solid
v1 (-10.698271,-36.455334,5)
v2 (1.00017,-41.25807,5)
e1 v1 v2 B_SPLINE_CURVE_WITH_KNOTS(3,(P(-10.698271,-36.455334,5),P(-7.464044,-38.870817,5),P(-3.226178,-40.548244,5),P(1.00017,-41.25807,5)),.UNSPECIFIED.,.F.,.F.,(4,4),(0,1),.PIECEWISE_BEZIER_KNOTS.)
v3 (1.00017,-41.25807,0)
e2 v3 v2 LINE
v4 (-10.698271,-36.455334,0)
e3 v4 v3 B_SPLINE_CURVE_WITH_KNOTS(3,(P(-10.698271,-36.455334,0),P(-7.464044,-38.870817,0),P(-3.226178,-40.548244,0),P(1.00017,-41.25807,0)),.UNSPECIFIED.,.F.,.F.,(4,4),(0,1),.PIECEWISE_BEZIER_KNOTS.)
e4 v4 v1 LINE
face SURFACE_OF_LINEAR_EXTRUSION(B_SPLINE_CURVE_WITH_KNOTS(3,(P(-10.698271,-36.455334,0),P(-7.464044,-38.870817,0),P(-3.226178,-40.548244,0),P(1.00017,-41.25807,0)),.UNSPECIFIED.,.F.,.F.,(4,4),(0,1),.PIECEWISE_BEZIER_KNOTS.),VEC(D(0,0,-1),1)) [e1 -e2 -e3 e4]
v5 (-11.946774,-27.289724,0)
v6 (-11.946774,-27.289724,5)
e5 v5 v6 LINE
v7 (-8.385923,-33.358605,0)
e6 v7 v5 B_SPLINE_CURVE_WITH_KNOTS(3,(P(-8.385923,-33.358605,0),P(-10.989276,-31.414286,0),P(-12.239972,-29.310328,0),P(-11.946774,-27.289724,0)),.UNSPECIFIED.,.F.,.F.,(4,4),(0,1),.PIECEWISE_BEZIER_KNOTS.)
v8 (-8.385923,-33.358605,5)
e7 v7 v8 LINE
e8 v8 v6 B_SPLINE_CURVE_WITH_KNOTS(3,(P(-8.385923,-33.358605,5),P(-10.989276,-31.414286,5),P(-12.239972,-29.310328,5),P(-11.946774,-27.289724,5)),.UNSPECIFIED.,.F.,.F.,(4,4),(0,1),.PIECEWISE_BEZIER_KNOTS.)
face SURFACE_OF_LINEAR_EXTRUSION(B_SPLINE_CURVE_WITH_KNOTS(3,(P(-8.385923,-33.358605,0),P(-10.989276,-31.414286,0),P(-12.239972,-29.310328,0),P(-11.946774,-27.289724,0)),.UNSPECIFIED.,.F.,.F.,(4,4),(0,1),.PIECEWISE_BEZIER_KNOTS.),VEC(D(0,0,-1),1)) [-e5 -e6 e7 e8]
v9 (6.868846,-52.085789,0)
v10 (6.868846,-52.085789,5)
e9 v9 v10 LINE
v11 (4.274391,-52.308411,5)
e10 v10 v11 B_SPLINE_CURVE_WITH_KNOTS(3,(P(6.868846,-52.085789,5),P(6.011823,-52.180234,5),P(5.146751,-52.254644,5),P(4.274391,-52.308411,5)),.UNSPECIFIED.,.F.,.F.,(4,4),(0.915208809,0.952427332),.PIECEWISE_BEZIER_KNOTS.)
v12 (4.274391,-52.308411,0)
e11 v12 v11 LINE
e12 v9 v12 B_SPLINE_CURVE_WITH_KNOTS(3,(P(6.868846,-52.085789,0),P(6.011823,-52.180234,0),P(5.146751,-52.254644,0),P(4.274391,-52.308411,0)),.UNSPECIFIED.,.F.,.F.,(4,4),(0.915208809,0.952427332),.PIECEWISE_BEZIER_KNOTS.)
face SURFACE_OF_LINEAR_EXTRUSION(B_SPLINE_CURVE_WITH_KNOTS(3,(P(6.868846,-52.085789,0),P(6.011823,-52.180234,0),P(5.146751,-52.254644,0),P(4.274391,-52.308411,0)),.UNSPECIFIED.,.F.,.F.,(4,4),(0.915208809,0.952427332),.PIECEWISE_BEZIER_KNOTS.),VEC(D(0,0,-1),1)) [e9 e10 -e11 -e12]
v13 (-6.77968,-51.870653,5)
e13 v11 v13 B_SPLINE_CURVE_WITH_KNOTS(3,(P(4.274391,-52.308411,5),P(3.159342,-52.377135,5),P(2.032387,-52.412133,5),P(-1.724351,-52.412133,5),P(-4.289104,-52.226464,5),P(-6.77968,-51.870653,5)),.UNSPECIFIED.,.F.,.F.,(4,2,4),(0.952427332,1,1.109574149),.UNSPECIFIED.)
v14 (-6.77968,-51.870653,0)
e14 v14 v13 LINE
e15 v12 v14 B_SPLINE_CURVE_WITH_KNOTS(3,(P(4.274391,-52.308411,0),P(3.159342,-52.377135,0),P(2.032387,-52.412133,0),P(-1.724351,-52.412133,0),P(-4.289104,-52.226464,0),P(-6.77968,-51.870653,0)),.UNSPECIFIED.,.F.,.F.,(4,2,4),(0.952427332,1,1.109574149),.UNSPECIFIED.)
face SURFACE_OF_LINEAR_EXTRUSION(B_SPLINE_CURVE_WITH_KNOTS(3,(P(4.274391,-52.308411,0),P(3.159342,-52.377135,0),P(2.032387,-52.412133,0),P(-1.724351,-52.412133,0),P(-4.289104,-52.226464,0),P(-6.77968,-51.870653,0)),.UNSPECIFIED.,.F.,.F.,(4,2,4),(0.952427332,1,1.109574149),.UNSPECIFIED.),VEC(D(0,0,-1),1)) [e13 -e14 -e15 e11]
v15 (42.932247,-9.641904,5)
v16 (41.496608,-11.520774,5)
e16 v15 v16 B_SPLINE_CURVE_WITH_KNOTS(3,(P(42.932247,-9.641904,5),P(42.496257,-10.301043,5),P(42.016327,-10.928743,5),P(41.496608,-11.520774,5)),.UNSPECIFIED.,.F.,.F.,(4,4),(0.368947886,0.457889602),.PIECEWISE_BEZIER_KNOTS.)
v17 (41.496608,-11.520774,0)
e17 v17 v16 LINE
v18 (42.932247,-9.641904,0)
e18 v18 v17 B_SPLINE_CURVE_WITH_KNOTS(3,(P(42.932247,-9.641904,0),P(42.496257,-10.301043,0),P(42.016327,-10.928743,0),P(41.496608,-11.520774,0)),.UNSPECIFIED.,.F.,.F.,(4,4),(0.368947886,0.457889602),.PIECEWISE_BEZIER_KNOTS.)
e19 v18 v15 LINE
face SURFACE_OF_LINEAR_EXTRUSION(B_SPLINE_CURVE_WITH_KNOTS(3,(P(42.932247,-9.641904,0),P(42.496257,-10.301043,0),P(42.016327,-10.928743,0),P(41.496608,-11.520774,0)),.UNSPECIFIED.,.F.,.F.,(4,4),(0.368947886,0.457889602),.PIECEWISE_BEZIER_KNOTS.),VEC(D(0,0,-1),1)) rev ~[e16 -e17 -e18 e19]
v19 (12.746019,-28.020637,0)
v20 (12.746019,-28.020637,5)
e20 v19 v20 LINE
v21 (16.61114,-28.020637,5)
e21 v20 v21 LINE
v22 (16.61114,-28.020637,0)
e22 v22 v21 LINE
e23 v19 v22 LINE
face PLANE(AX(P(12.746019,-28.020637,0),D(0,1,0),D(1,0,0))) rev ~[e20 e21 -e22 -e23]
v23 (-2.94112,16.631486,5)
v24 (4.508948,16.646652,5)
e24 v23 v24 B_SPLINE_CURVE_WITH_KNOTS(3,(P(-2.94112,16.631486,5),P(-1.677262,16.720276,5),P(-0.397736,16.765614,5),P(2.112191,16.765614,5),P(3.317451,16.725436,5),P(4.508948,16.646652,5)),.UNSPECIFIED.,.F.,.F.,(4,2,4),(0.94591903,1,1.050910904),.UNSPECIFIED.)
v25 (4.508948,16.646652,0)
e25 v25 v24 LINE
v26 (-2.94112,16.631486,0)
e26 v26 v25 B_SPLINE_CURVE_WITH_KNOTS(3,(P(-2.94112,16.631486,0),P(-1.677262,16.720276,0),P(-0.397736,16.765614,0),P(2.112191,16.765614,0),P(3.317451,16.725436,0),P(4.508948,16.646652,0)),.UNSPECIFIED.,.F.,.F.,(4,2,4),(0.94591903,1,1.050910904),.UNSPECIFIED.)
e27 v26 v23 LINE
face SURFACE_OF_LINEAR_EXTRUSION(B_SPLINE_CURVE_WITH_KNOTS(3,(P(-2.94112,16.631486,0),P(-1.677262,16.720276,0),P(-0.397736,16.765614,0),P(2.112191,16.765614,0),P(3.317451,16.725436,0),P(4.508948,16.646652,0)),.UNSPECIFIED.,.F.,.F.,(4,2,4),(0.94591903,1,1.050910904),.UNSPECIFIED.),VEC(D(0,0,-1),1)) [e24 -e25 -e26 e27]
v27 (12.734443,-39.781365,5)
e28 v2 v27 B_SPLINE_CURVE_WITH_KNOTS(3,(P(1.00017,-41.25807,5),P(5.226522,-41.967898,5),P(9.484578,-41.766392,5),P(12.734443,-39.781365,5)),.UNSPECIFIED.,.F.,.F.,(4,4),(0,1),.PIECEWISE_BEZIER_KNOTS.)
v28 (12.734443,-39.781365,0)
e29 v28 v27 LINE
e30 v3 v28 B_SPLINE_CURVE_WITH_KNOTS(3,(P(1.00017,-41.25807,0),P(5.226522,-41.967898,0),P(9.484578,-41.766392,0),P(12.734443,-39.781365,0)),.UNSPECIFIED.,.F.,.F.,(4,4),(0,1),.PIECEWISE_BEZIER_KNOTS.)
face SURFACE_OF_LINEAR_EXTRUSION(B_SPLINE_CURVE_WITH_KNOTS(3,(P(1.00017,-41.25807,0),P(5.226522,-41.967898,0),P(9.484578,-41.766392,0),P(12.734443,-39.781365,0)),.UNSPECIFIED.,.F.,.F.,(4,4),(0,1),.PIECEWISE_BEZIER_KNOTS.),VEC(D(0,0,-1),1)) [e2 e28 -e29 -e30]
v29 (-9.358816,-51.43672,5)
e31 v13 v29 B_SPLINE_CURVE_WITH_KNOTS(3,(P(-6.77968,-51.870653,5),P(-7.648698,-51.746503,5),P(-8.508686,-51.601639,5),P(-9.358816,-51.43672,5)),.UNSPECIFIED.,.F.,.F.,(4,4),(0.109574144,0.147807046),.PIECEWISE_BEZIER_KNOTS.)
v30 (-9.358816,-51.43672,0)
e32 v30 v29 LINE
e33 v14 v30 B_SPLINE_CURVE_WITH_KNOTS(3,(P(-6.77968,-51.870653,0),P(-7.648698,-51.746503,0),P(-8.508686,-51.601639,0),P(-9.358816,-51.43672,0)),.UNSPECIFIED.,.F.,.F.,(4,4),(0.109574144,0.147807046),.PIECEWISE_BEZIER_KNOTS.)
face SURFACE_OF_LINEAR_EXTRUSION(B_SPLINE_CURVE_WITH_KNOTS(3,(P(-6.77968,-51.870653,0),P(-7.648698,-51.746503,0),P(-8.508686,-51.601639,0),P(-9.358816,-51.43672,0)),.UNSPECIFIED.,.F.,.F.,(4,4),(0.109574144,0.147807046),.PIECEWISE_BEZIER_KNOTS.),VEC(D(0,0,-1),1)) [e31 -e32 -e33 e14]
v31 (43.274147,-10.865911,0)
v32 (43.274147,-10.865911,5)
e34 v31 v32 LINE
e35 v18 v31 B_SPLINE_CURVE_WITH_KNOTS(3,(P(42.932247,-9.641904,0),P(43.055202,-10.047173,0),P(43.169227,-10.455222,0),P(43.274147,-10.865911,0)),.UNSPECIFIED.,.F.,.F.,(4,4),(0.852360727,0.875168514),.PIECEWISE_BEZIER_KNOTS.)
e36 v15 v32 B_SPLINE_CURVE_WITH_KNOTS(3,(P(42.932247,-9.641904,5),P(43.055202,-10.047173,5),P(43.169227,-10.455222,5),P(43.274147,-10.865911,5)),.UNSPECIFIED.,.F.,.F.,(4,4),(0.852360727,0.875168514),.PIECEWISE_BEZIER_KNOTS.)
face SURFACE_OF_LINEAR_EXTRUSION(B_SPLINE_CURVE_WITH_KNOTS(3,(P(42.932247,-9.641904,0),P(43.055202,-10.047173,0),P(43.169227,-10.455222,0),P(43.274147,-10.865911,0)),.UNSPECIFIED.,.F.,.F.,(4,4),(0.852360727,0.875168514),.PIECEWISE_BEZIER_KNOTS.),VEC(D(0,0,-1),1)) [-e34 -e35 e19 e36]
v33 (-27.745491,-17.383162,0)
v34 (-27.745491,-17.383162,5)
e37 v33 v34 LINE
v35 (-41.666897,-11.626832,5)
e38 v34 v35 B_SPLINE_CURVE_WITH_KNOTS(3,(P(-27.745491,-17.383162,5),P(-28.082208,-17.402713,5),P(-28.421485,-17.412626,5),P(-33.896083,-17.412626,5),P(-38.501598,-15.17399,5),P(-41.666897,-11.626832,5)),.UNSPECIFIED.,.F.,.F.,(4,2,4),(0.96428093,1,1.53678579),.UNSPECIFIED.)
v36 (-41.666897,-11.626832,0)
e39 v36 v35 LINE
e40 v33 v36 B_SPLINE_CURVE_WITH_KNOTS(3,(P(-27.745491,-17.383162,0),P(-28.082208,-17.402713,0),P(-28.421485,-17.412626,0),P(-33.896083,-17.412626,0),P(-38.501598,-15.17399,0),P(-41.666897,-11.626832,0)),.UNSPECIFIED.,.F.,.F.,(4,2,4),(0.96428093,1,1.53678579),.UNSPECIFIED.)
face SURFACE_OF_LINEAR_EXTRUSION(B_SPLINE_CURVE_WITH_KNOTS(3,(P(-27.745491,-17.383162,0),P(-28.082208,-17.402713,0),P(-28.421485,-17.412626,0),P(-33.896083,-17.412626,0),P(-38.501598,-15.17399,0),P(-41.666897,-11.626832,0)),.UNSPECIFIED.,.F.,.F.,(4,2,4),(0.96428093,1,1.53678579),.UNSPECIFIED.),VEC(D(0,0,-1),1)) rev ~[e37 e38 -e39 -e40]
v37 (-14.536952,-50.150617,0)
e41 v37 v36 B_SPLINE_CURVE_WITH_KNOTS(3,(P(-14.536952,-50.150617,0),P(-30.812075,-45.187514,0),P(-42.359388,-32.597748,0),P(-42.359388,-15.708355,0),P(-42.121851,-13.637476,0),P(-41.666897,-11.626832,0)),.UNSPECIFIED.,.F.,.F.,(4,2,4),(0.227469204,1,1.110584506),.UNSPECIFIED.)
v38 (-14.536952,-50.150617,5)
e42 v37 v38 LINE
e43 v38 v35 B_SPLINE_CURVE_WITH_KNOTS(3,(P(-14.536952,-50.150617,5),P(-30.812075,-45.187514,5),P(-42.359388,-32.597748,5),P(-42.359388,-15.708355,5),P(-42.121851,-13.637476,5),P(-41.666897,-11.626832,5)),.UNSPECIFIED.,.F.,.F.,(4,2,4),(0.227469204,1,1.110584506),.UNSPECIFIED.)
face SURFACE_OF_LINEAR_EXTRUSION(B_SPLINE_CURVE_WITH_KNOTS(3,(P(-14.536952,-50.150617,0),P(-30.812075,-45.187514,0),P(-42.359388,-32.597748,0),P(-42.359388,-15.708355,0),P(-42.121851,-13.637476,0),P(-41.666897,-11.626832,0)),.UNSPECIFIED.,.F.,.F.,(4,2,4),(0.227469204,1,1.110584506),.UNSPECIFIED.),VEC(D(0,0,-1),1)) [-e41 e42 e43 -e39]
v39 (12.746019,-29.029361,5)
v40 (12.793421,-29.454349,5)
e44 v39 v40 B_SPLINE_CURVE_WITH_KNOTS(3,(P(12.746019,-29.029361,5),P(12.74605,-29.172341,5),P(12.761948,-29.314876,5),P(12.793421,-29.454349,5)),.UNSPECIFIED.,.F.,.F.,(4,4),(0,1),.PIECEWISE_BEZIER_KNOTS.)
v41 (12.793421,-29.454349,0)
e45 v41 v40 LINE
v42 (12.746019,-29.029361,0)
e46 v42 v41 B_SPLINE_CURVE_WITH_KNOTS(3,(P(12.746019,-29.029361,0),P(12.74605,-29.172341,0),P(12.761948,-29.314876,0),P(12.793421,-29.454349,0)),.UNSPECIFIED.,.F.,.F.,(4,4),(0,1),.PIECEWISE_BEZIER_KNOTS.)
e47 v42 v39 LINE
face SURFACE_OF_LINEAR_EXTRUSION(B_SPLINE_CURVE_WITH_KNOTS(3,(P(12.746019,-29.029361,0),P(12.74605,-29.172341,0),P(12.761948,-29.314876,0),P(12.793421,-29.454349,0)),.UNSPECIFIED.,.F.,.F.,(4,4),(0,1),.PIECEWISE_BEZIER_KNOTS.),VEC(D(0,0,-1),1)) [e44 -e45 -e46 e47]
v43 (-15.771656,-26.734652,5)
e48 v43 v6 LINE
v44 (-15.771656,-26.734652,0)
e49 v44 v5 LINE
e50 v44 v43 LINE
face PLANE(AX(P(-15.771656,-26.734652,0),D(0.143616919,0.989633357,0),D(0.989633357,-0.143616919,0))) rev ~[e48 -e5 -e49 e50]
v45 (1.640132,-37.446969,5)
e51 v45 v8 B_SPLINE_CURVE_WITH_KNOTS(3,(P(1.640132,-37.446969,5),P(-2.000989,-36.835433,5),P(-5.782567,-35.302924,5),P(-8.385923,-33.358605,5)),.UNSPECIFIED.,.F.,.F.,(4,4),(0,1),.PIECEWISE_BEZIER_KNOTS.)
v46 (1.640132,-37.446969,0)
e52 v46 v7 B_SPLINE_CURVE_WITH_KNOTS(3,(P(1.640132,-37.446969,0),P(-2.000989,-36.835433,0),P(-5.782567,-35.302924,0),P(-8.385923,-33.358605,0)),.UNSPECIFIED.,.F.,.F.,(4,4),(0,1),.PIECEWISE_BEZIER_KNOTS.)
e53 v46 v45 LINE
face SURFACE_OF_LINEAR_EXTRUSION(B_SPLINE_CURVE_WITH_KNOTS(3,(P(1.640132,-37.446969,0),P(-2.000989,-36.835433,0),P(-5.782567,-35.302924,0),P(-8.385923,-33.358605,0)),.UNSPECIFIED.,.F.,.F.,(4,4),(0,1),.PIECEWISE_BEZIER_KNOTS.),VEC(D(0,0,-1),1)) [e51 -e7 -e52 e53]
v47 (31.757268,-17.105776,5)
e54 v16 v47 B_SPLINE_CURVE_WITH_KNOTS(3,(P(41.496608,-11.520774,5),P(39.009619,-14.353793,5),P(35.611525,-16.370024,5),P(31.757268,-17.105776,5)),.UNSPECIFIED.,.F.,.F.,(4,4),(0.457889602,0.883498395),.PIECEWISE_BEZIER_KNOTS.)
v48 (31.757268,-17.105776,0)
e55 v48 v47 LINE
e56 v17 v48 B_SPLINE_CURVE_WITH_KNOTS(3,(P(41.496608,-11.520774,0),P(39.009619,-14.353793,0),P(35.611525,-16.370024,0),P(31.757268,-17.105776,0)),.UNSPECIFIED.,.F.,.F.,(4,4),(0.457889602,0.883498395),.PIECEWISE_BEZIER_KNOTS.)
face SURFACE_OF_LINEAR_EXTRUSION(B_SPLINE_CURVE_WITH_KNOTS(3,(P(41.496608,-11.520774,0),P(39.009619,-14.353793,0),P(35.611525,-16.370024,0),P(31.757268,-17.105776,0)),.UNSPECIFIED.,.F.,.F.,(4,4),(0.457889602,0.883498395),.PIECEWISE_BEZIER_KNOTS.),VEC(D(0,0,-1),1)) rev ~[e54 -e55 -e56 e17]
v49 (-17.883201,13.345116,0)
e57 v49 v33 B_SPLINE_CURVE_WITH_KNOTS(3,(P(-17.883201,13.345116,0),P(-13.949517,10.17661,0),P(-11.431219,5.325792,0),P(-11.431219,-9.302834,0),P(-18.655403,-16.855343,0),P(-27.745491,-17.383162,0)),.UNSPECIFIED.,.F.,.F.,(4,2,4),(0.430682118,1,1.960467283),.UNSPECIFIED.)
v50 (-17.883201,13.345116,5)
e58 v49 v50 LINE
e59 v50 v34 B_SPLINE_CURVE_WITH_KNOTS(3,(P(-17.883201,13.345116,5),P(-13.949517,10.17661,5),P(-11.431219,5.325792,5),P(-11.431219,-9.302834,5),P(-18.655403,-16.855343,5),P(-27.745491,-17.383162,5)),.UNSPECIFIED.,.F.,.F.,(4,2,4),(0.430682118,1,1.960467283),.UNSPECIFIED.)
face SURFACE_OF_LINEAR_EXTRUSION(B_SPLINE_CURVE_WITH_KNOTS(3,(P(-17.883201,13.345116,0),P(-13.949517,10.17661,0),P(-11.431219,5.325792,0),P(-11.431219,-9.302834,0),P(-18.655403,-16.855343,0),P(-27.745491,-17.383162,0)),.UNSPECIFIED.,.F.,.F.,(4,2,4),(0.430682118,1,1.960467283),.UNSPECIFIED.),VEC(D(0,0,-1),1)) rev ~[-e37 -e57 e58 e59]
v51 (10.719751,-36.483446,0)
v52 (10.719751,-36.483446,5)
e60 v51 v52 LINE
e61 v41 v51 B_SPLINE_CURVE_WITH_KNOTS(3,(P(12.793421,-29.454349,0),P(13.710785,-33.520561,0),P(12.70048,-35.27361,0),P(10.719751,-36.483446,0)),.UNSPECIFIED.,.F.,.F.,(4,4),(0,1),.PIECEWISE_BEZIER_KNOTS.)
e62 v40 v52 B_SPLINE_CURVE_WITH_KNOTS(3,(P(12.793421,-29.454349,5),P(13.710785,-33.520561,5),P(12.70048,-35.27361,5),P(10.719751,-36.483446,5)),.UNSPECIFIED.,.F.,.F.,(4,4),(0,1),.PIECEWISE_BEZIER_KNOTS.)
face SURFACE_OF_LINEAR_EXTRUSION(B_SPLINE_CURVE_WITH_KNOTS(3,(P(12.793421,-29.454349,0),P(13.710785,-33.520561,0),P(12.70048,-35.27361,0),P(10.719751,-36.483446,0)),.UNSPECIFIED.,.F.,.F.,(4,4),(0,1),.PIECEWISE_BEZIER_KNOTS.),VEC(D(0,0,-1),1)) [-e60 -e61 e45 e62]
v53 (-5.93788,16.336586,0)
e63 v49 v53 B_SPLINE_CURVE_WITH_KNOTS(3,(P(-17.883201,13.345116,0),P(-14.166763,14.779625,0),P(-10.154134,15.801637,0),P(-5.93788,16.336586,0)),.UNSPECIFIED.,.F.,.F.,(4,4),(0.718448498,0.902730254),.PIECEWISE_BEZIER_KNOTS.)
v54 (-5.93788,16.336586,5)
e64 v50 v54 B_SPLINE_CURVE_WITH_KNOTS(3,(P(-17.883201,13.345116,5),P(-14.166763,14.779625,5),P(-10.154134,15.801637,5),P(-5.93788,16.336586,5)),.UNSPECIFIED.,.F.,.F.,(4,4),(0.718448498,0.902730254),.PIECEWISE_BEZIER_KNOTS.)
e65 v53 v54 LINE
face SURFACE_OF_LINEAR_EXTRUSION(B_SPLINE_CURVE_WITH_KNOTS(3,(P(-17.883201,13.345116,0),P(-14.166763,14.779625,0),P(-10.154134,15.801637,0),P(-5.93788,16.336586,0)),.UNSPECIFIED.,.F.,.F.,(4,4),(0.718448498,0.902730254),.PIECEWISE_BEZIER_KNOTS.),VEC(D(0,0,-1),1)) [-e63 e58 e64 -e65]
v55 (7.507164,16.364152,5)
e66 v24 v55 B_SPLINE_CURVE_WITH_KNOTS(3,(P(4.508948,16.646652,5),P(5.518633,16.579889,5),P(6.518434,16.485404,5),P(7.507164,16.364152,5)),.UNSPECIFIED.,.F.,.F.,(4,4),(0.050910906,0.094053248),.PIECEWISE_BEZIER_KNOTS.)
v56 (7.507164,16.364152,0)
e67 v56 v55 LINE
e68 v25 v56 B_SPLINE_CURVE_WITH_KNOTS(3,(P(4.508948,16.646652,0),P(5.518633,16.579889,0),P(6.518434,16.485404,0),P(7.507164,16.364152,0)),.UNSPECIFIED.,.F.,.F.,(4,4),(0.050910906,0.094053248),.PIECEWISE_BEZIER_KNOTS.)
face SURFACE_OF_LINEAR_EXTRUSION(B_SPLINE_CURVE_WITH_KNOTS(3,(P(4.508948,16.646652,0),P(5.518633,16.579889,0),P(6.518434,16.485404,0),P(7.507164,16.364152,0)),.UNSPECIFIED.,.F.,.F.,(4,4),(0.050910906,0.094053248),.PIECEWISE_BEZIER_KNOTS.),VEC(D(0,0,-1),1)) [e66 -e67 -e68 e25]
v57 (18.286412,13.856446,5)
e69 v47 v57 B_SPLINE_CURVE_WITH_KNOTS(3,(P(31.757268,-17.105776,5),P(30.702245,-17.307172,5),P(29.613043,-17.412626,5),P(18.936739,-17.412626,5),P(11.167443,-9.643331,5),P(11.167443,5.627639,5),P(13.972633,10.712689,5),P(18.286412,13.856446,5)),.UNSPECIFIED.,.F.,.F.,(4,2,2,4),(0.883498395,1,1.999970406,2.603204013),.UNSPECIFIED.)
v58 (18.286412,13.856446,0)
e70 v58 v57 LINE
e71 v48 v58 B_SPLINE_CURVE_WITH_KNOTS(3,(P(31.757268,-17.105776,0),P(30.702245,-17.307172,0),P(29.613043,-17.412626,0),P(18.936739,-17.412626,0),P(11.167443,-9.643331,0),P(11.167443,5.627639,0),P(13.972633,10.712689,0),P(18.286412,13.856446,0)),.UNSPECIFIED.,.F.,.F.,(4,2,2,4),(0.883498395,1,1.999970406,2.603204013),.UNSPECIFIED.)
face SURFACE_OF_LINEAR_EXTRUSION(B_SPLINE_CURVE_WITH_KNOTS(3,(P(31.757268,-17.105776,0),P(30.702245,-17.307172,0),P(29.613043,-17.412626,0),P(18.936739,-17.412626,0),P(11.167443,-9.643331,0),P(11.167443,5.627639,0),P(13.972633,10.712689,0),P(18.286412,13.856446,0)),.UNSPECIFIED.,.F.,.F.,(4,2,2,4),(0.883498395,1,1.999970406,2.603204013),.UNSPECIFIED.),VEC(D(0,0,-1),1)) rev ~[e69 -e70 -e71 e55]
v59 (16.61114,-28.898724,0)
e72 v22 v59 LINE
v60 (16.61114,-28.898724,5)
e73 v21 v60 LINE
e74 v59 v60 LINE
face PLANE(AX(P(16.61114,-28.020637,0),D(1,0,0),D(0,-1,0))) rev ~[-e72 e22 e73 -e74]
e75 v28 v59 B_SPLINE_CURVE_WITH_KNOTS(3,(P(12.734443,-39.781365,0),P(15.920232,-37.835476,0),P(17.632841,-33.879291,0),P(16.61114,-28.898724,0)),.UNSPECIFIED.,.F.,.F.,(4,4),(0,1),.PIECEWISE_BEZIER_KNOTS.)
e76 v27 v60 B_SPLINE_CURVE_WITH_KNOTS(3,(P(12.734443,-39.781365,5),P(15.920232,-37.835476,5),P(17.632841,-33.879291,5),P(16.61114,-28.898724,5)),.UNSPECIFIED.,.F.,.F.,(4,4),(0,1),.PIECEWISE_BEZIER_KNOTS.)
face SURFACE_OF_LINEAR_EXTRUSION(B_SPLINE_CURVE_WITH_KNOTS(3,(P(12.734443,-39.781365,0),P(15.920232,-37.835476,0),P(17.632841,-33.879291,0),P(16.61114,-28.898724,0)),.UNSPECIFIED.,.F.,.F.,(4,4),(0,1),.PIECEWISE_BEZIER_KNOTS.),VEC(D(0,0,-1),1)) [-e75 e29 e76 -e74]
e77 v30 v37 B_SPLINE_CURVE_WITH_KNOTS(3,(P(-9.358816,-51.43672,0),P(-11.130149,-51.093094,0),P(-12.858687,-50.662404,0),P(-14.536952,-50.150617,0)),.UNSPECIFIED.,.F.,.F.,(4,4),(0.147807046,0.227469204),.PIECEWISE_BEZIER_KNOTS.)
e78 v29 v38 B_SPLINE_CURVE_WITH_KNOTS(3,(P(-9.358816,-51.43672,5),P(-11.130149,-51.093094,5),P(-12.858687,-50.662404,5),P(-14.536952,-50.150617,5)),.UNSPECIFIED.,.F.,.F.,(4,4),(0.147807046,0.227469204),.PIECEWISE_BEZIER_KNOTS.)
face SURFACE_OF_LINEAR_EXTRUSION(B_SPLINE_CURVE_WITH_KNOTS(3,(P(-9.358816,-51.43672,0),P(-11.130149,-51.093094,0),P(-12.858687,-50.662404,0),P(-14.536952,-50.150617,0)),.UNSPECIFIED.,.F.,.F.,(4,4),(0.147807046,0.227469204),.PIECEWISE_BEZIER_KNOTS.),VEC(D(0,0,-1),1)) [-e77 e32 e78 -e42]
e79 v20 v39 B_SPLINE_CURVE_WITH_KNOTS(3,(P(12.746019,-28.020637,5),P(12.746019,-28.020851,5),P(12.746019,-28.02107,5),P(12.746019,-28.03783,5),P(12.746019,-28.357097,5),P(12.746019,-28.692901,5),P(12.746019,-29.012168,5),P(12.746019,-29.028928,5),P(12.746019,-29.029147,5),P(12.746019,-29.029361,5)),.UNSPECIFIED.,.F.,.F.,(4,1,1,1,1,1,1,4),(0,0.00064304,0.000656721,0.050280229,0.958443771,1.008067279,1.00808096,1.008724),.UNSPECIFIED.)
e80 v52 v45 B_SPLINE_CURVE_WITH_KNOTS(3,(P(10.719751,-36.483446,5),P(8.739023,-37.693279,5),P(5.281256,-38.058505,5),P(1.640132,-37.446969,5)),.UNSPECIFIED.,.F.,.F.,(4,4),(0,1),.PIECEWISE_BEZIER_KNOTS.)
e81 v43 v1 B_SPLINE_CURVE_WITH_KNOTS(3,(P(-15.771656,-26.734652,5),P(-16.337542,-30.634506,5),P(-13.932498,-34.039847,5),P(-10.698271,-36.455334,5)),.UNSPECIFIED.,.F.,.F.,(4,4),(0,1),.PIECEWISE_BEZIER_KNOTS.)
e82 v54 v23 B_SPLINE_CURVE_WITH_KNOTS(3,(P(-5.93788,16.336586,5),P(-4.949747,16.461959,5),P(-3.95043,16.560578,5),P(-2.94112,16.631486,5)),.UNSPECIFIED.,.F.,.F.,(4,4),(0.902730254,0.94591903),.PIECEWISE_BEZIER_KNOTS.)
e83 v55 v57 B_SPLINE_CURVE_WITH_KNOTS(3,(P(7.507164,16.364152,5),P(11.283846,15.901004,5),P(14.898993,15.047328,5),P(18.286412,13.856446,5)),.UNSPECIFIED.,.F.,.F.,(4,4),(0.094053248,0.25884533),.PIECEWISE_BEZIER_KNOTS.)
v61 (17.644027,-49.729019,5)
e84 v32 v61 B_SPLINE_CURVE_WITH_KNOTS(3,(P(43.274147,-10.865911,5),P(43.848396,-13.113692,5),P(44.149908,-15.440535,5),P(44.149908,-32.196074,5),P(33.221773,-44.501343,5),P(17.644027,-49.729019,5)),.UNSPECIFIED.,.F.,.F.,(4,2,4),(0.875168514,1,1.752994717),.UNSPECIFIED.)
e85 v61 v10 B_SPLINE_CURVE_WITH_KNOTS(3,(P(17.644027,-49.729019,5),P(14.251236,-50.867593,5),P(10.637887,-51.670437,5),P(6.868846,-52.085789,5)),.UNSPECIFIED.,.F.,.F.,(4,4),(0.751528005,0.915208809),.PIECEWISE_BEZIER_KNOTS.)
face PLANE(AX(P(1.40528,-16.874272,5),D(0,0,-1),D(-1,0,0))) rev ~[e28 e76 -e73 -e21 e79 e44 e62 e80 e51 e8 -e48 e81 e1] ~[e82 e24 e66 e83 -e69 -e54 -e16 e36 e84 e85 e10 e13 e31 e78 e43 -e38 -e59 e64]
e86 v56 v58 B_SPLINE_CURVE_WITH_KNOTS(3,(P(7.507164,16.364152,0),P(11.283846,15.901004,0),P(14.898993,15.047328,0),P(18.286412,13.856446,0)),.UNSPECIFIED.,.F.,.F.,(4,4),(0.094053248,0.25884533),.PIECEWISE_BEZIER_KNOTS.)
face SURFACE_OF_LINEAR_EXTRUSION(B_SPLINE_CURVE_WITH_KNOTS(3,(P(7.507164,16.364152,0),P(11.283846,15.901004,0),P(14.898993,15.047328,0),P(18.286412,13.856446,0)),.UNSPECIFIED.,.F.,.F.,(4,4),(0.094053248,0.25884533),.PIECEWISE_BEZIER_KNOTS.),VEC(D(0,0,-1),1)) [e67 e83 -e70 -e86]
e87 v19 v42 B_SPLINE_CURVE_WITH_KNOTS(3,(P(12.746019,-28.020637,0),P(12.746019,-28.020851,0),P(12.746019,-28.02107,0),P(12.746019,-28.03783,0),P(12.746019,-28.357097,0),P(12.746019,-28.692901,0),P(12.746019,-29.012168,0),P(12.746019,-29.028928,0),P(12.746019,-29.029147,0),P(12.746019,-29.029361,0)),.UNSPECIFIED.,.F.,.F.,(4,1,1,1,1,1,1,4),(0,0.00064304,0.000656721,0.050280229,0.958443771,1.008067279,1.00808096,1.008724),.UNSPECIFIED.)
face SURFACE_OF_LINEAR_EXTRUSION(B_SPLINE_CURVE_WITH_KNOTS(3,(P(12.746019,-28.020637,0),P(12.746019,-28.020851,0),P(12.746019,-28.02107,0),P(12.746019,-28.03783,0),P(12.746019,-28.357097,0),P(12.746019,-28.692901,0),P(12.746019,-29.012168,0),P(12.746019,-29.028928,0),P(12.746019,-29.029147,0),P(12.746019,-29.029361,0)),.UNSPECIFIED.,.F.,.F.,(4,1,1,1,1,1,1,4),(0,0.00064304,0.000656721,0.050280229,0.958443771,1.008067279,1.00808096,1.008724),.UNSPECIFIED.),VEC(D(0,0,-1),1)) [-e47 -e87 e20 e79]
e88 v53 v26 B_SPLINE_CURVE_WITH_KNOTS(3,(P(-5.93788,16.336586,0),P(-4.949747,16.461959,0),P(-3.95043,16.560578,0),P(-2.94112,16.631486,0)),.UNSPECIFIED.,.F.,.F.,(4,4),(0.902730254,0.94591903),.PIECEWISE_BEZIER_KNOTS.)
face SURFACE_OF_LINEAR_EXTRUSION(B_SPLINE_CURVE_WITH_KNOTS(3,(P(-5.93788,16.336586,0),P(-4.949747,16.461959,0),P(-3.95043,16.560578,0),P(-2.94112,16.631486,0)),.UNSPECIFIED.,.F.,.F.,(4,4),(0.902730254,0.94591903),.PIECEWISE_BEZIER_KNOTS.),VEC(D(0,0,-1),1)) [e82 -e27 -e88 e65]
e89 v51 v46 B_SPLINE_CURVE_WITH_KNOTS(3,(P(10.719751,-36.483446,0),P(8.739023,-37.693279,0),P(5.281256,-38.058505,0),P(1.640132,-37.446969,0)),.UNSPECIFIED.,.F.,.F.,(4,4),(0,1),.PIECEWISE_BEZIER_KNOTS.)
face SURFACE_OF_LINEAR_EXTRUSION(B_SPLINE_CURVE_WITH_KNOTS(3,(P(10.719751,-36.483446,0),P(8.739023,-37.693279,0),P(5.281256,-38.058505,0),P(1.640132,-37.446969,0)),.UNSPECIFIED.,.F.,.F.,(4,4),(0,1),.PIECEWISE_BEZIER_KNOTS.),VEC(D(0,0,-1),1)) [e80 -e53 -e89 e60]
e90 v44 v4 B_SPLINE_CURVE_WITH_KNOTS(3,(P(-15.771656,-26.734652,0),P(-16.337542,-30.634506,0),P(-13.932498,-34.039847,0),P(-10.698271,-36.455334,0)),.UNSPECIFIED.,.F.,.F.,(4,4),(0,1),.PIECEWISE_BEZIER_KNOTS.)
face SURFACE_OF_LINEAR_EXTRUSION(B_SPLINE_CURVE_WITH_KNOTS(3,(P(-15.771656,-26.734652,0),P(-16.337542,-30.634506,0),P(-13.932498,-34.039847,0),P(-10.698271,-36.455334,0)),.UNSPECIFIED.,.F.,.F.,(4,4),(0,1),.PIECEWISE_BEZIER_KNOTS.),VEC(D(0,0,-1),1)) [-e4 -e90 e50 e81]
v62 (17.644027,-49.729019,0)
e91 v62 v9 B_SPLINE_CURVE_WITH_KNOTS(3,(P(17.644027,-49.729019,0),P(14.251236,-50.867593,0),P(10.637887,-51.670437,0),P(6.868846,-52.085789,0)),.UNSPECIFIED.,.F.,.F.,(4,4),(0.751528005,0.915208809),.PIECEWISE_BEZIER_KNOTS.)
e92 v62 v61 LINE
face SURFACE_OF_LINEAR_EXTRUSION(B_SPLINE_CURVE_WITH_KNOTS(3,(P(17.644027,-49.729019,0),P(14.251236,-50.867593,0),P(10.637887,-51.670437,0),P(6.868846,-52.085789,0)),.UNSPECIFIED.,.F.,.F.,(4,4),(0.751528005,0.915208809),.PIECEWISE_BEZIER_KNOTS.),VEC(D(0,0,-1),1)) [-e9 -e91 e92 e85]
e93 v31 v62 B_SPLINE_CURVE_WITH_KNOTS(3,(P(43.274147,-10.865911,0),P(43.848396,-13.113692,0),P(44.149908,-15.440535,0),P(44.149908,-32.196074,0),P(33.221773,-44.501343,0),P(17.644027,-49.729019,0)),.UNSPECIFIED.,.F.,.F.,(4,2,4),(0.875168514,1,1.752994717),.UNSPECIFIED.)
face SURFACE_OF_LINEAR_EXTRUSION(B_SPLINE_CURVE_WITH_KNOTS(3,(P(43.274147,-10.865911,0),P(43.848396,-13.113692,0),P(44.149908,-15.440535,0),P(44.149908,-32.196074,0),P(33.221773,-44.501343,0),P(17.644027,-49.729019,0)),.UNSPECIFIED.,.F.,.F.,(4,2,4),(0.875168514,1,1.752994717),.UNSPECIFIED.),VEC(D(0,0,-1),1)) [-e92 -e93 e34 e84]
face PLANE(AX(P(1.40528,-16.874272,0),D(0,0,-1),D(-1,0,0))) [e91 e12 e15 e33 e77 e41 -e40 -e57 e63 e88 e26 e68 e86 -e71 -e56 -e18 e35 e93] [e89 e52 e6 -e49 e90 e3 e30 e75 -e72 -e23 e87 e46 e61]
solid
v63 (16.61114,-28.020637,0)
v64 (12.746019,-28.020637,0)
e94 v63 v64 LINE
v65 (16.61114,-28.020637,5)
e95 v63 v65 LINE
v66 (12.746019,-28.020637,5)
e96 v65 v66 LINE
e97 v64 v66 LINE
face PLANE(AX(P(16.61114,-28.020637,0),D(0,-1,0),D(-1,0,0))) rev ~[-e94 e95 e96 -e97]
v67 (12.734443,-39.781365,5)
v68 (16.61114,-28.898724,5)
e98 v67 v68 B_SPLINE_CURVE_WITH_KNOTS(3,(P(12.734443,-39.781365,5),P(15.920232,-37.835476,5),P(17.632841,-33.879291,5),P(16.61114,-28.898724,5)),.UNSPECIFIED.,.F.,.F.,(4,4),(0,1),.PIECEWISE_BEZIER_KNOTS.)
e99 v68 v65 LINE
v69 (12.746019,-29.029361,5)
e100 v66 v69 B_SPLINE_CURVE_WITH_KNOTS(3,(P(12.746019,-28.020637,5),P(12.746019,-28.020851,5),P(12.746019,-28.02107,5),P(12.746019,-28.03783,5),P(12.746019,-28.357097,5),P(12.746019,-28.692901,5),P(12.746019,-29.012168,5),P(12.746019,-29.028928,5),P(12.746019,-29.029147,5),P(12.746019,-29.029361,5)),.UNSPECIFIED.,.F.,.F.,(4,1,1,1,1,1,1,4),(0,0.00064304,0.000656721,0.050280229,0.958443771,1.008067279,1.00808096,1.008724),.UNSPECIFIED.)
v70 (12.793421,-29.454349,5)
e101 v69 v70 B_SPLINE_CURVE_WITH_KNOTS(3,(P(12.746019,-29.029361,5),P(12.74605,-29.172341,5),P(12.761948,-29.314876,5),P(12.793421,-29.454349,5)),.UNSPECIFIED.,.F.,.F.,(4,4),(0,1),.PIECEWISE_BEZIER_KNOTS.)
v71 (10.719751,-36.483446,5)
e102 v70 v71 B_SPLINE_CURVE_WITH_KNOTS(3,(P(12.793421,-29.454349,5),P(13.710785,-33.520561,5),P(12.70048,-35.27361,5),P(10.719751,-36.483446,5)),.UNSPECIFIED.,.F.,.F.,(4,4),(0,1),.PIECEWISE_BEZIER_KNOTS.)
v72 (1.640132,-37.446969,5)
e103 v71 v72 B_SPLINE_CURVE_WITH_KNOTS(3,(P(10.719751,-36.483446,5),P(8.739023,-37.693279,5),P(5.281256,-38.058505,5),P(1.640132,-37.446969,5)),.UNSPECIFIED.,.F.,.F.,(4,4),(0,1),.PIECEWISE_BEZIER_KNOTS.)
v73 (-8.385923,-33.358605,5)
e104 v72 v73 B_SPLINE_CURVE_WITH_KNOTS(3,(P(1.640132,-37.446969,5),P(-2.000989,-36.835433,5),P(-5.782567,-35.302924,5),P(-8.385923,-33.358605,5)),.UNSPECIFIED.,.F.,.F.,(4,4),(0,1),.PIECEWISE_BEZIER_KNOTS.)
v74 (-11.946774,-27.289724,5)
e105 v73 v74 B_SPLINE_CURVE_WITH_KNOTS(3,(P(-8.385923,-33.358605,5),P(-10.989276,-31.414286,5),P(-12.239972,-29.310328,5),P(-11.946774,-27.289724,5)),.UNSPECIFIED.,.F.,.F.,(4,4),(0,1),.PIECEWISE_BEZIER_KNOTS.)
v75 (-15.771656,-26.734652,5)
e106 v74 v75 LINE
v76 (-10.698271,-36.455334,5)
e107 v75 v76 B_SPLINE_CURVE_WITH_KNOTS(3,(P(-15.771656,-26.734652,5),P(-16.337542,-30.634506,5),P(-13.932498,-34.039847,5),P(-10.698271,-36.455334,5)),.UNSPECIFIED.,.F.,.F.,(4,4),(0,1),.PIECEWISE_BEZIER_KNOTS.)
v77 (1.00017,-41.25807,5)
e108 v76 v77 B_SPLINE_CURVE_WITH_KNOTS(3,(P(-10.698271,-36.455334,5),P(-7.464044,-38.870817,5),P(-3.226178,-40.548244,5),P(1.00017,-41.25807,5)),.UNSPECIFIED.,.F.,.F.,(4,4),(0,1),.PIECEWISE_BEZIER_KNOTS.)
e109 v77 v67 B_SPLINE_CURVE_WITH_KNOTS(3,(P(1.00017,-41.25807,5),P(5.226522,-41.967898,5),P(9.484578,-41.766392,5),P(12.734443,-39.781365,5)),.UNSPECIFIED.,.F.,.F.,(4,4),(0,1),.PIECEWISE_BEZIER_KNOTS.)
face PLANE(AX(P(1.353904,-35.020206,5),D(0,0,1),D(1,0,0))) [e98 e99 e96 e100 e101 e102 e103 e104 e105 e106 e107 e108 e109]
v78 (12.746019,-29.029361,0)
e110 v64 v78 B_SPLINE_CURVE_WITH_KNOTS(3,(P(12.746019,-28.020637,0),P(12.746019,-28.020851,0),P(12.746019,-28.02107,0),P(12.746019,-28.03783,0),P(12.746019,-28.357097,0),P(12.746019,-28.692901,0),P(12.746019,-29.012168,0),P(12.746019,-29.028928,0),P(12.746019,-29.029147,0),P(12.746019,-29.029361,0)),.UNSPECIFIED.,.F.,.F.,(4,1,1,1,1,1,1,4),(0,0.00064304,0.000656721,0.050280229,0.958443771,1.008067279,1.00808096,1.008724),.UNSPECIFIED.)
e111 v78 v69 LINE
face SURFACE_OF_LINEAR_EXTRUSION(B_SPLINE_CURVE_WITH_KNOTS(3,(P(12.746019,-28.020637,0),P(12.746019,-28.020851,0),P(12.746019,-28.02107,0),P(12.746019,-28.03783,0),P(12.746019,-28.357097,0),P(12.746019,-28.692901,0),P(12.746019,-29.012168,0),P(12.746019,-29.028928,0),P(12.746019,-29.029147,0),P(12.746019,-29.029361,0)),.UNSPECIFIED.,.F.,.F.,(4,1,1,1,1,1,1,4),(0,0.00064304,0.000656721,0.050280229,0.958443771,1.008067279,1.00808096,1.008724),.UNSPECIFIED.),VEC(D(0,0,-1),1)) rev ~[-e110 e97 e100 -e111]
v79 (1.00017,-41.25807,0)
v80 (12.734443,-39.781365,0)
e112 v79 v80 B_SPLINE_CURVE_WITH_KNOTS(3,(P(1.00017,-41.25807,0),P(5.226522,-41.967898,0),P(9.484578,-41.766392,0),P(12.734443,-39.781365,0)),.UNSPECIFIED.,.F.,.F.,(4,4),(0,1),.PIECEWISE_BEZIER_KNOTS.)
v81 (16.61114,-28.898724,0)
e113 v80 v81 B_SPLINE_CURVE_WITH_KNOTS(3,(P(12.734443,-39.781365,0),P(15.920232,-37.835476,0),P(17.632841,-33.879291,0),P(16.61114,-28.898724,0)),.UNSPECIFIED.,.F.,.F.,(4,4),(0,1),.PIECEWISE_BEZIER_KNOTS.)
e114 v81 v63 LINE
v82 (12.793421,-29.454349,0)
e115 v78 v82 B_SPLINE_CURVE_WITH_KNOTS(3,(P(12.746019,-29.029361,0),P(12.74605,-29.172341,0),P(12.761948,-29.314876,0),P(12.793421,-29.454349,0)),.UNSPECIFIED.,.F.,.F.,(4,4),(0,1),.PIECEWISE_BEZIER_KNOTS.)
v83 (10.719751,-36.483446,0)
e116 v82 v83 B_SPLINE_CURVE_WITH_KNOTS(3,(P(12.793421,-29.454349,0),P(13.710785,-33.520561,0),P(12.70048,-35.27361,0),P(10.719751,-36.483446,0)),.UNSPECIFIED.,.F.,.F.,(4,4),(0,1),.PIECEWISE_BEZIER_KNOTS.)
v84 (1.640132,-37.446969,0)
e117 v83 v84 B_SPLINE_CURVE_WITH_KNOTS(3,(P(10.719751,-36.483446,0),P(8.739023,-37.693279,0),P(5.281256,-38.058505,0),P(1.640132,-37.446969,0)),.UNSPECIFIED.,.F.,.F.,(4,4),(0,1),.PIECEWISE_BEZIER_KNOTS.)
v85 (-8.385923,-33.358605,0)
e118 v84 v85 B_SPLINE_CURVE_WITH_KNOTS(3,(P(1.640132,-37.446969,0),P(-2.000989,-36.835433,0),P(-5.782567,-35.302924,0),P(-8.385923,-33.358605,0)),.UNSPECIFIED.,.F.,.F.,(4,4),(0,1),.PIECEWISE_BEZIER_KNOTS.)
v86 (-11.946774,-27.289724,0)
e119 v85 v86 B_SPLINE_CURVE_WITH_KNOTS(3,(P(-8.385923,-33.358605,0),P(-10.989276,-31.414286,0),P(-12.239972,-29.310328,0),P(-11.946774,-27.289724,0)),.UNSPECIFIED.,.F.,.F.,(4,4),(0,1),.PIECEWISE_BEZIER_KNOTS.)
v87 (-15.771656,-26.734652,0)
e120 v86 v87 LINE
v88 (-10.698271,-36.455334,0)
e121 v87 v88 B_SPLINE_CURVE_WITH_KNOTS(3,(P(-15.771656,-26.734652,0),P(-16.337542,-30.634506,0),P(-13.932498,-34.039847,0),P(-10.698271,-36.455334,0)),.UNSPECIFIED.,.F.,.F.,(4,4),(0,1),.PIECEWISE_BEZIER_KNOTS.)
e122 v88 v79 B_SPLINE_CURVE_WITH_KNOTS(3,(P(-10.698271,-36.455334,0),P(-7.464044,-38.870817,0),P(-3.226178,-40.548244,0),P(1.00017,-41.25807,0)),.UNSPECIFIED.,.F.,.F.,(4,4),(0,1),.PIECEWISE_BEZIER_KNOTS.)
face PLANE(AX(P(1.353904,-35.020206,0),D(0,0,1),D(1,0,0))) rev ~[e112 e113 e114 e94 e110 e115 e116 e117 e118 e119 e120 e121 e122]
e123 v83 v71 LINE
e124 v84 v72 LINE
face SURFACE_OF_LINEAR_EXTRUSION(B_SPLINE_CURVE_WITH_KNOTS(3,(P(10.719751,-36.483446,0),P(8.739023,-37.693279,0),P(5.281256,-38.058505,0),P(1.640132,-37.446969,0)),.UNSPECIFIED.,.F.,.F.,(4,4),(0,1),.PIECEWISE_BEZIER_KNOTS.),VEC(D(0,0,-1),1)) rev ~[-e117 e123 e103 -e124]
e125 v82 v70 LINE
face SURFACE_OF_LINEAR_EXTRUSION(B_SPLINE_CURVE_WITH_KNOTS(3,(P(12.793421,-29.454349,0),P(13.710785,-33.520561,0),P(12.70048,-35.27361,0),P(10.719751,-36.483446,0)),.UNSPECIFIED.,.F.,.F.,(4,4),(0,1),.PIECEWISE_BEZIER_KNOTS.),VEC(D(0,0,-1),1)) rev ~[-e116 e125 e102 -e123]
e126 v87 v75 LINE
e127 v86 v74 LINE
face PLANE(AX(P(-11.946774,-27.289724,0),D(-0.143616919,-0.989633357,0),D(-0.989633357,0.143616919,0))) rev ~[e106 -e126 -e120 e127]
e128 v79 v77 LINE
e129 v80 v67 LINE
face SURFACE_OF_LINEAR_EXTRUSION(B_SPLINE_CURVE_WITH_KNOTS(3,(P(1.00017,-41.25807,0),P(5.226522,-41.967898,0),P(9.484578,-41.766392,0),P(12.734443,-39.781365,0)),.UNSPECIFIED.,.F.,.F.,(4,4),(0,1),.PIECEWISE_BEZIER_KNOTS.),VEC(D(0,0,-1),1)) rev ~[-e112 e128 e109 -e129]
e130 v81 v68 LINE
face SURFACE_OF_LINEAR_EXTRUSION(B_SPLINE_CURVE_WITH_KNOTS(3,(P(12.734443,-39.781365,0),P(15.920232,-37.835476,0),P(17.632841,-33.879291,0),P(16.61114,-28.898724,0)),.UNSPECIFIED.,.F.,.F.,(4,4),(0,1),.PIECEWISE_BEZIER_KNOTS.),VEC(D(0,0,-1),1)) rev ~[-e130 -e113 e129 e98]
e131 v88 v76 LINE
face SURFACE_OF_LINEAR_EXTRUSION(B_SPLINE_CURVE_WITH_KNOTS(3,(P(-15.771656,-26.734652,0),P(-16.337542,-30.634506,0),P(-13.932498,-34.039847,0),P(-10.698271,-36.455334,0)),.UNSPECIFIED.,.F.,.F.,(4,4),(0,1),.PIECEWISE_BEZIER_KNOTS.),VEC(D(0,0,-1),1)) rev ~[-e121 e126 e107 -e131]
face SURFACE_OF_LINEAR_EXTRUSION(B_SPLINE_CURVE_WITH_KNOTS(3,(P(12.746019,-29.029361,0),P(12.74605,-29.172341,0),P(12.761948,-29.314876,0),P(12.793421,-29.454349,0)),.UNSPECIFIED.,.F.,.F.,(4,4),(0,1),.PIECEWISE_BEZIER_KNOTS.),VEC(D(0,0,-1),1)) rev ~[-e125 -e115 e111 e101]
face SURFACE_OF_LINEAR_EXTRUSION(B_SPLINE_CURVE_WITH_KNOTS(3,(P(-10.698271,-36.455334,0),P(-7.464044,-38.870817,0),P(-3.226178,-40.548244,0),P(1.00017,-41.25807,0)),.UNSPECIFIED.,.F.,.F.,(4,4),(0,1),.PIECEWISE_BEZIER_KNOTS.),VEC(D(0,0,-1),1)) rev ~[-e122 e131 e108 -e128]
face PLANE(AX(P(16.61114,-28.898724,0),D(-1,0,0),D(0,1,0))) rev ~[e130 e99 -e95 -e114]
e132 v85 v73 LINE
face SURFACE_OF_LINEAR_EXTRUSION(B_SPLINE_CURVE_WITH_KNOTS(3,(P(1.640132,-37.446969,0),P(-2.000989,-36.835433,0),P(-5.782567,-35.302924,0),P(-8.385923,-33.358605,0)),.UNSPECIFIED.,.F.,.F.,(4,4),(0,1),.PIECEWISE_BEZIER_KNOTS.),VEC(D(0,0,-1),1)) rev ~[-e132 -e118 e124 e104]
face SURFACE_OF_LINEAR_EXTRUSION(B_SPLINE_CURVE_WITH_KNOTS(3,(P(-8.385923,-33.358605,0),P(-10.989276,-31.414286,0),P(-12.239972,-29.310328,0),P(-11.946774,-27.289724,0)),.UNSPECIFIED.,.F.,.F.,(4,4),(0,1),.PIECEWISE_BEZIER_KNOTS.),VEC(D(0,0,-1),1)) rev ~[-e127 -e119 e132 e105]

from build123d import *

# Parameters (mm, degrees)
F1_DEPTH = 5
F2_DEPTH = 5


with BuildPart() as f1:
    # F0 (on Top) → F1 (new body)
    with BuildSketch(Plane.XY):
        with BuildLine():
            add(Edge.make_bspline(
                [(12.734443, -39.781365), (15.920232, -37.835476), (17.632841, -33.879291), (16.61114, -28.898724)],
                knots=[0, 0, 0, 0, 1, 1, 1, 1], degree=3))
            Line((16.61114, -28.898724), (16.61114, -28.020637))
            Line((16.61114, -28.020637), (12.746019, -28.020637))
            add(Edge.make_bspline(
                [(12.746019, -28.020637), (12.746019, -28.0208513466), (12.746019, -28.0210702537), (12.746019, -28.0378303299), (12.746019, -28.3570972405), (12.746019, -28.6929007595), (12.746019, -29.0121676701), (12.746019, -29.0289277463), (12.746019, -29.0291466534), (12.746019, -29.029361)],
                knots=[0, 0, 0, 0, 0.0006430397, 0.0006567214, 0.0502802287, 0.9584437713, 1.0080672786, 1.0080809603, 1.008724, 1.008724, 1.008724, 1.008724], degree=3))
            add(Edge.make_bspline(
                [(12.746019, -29.029361), (12.74605, -29.172341), (12.761948, -29.314876), (12.793421, -29.454349)],
                knots=[0, 0, 0, 0, 1, 1, 1, 1], degree=3))
            add(Edge.make_bspline(
                [(12.793421, -29.454349), (13.710785, -33.520561), (12.70048, -35.27361), (10.719751, -36.483446)],
                knots=[0, 0, 0, 0, 1, 1, 1, 1], degree=3))
            add(Edge.make_bspline(
                [(10.719751, -36.483446), (8.739023, -37.693279), (5.281256, -38.058505), (1.640132, -37.446969)],
                knots=[0, 0, 0, 0, 1, 1, 1, 1], degree=3))
            add(Edge.make_bspline(
                [(1.640132, -37.446969), (-2.000989, -36.835433), (-5.782567, -35.302924), (-8.385923, -33.358605)],
                knots=[0, 0, 0, 0, 1, 1, 1, 1], degree=3))
            add(Edge.make_bspline(
                [(-8.385923, -33.358605), (-10.989276, -31.414286), (-12.239972, -29.310328), (-11.946774, -27.289724)],
                knots=[0, 0, 0, 0, 1, 1, 1, 1], degree=3))
            Line((-11.946774, -27.289724), (-15.771656, -26.734652))
            add(Edge.make_bspline(
                [(-15.771656, -26.734652), (-16.337542, -30.634506), (-13.932498, -34.039847), (-10.698271, -36.455334)],
                knots=[0, 0, 0, 0, 1, 1, 1, 1], degree=3))
            add(Edge.make_bspline(
                [(-10.698271, -36.455334), (-7.464044, -38.870817), (-3.226178, -40.548244), (1.00017, -41.25807)],
                knots=[0, 0, 0, 0, 1, 1, 1, 1], degree=3))
            add(Edge.make_bspline(
                [(1.00017, -41.25807), (5.226522, -41.967898), (9.484578, -41.766392), (12.734443, -39.781365)],
                knots=[0, 0, 0, 0, 1, 1, 1, 1], degree=3))
        make_face()
    extrude(amount=F1_DEPTH)


with BuildPart() as f1b:
    # F0 (on Top) → F1, piece 2 (new body)
    with BuildSketch(Plane.XY):
        with BuildLine():
            add(Edge.make_bspline(
                [(-27.7454914934, -17.3831615798), (-25.4848622372, -19.2736486235), (-23.4287961137, -21.451514347), (-21.6284719984, -23.9119219826)],
                knots=[0.8661202793, 0.8661202793, 0.8661202793, 0.8661202793, 1, 1, 1, 1], degree=3))
            add(Edge.make_bspline(
                [(-27.7454914981, -17.3831615977), (-28.0822081964, -17.4027131688), (-28.4214851444, -17.412626), (-28.76305, -17.412626)],
                knots=[0.9642809302, 0.9642809302, 0.9642809302, 0.9642809302, 1, 1, 1, 1], degree=3))
            add(Edge.make_bspline(
                [(-28.7630500014, -17.4126260018), (-33.8960829139, -17.4126260018), (-38.5015979977, -15.1739896926), (-41.6668967581, -11.6268322113)],
                knots=[0, 0, 0, 0, 0.5367857347, 0.5367857347, 0.5367857347, 0.5367857347], degree=3))
            add(Edge.make_bspline(
                [(-42.3593879972, -17.8232599981), (-42.3593879972, -15.70835477), (-42.1218509095, -13.6374762635), (-41.6668967569, -11.6268322116)],
                knots=[0, 0, 0, 0, 0.1108003269, 0.1108003269, 0.1108003269, 0.1108003269], degree=3))
            add(Edge.make_bspline(
                [(-14.5369517464, -50.1506168986), (-30.8120747848, -45.1875138054), (-42.359388, -32.5977476883), (-42.359388, -17.82326)],
                knots=[0.2274692045, 0.2274692045, 0.2274692045, 0.2274692045, 1, 1, 1, 1], degree=3))
            add(Edge.make_bspline(
                [(-21.628472002, -23.9119220042), (-15.9783217735, -31.6281219583), (-13.7253066716, -40.8854651209), (-14.5369517491, -50.1506168989)],
                knots=[0, 0, 0, 0, 0.4190171031, 0.4190171031, 0.4190171031, 0.4190171031], degree=3))
        make_face()
    extrude(amount=F1_DEPTH)



with BuildPart() as f1c:
    # F0 (on Top) → F1, piece 3 (new body)
    with BuildSketch(Plane.XY):
        with BuildLine():
            add(Edge.make_bspline(
                [(41.496607571, -11.5207741803), (39.0096189113, -14.3537933789), (35.6115250768, -16.3700235375), (31.7572682547, -17.1057755436)],
                knots=[0.457889602, 0.457889602, 0.457889602, 0.457889602, 0.8834983945, 0.8834983945, 0.8834983945, 0.8834983945], degree=3))
            add(Edge.make_bspline(
                [(24.801034, -24.322837), (26.8241254465, -21.5600342644), (29.1667116086, -19.1520336904), (31.7572682547, -17.1057755436)],
                knots=[0, 0, 0, 0, 0.1500300155, 0.1500300155, 0.1500300155, 0.1500300155], degree=3))
            add(Edge.make_bspline(
                [(17.6440274537, -49.729019344), (17.0311754569, -40.7368621909), (19.3145165012, -31.800141131), (24.801034, -24.322837)],
                knots=[0.593126466, 0.593126466, 0.593126466, 0.593126466, 1, 1, 1, 1], degree=3))
            add(Edge.make_bspline(
                [(44.149908, -17.82326), (44.149908, -32.1960737794), (33.2217734232, -44.5013432134), (17.6440274514, -49.7290193437)],
                knots=[0, 0, 0, 0, 0.7515280054, 0.7515280054, 0.7515280054, 0.7515280054], degree=3))
            add(Edge.make_bspline(
                [(43.2741469204, -10.8659114346), (43.8483964355, -13.1136924153), (44.149908, -15.4405345256), (44.149908, -17.82326)],
                knots=[0.8751685145, 0.8751685145, 0.8751685145, 0.8751685145, 1, 1, 1, 1], degree=3))
            add(Edge.make_bspline(
                [(41.496607571, -11.5207741803), (42.0831921323, -11.2889186769), (42.6758725904, -11.0706148581), (43.2741469213, -10.8659114372)],
                knots=[0.3213713892, 0.3213713892, 0.3213713892, 0.3213713892, 0.3500969523, 0.3500969523, 0.3500969523, 0.3500969523], degree=3))
        make_face()
        with BuildLine():
            add(Edge.make_bspline(
                [(42.9322474575, -9.6419037564), (42.4962572948, -10.3010425075), (42.0163267182, -10.9287432049), (41.496607571, -11.5207741803)],
                knots=[0.3689478861, 0.3689478861, 0.3689478861, 0.3689478861, 0.457889602, 0.457889602, 0.457889602, 0.457889602], degree=3))
            add(Edge.make_bspline(
                [(41.496607571, -11.5207741803), (42.0831921323, -11.2889186769), (42.6758725904, -11.0706148581), (43.2741469213, -10.8659114372)],
                knots=[0.3213713892, 0.3213713892, 0.3213713892, 0.3213713892, 0.3500969523, 0.3500969523, 0.3500969523, 0.3500969523], degree=3))
            add(Edge.make_bspline(
                [(42.9322474577, -9.6419037563), (43.0552016039, -10.0471728179), (43.1692265907, -10.4552224997), (43.2741469204, -10.8659114346)],
                knots=[0.8523607274, 0.8523607274, 0.8523607274, 0.8523607274, 0.8751685145, 0.8751685145, 0.8751685145, 0.8751685145], degree=3))
        make_face()
    extrude(amount=F1_DEPTH)


with BuildPart() as f1b_1:
    add(f1b.part)

    add(f1c.part)  # F2 merges F1c
    # F0 (on Top) → F2 (join)
    with BuildSketch(Plane.XY):
        with BuildLine():
            add(Edge.make_bspline(
                [(-5.9378795005, 16.3365863681), (-4.9497466604, 16.4619585653), (-3.9504295333, 16.560578393), (-2.9411196849, 16.6314859824)],
                knots=[0.9027302545, 0.9027302545, 0.9027302545, 0.9027302545, 0.9459190297, 0.9459190297, 0.9459190297, 0.9459190297], degree=3))
            add(Edge.make_bspline(
                [(-17.8832007592, 13.3451160525), (-14.1667628508, 14.7796245747), (-10.1541337023, 15.8016369849), (-5.9378795005, 16.3365863681)],
                knots=[0.7184484983, 0.7184484983, 0.7184484983, 0.7184484983, 0.9027302545, 0.9027302545, 0.9027302545, 0.9027302545], degree=3))
            add(Edge.make_bspline(
                [(-17.8832007591, 13.3451160522), (-13.9495167672, 10.1766095439), (-11.431219, 5.3257917383), (-11.431219, -0.118331)],
                knots=[0.4306821184, 0.4306821184, 0.4306821184, 0.4306821184, 1, 1, 1, 1], degree=3))
            add(Edge.make_bspline(
                [(-11.431219, -0.118331), (-11.431219, -9.3028339682), (-18.6554034185, -16.855342504), (-27.7454914981, -17.3831615977)],
                knots=[0, 0, 0, 0, 0.9642809302, 0.9642809302, 0.9642809302, 0.9642809302], degree=3))
            add(Edge.make_bspline(
                [(-27.7454914934, -17.3831615798), (-25.4848622372, -19.2736486235), (-23.4287961137, -21.451514347), (-21.6284719984, -23.9119219826)],
                knots=[0.8661202793, 0.8661202793, 0.8661202793, 0.8661202793, 1, 1, 1, 1], degree=3))
            add(Edge.make_bspline(
                [(-21.628472002, -23.9119220042), (-15.9783217735, -31.6281219583), (-13.7253066716, -40.8854651209), (-14.5369517491, -50.1506168989)],
                knots=[0, 0, 0, 0, 0.4190171031, 0.4190171031, 0.4190171031, 0.4190171031], degree=3))
            add(Edge.make_bspline(
                [(-9.358816, -51.4367196264), (-11.1301489273, -51.0930942082), (-12.8586867056, -50.6624042685), (-14.5369517464, -50.1506168986)],
                knots=[0.1478070462, 0.1478070462, 0.1478070462, 0.1478070462, 0.2274692045, 0.2274692045, 0.2274692045, 0.2274692045], degree=3))
            add(Edge.make_bspline(
                [(-6.77968, -51.8706532523), (-7.6486983636, -51.7465029707), (-8.5086859107, -51.6016385431), (-9.358816, -51.4367196264)],
                knots=[0.1095741445, 0.1095741445, 0.1095741445, 0.1095741445, 0.1478070462, 0.1478070462, 0.1478070462, 0.1478070462], degree=3))
            add(Edge.make_bspline(
                [(0.895119, -52.412133), (-1.7243512939, -52.412133), (-4.2891040964, -52.2264635695), (-6.77968, -51.8706532523)],
                knots=[0, 0, 0, 0, 0.1095741445, 0.1095741445, 0.1095741445, 0.1095741445], degree=3))
            add(Edge.make_bspline(
                [(4.274391, -52.3084107676), (3.1593420107, -52.3771353208), (2.032387159, -52.412133), (0.895119, -52.412133)],
                knots=[0.9524273319, 0.9524273319, 0.9524273319, 0.9524273319, 1, 1, 1, 1], degree=3))
            add(Edge.make_bspline(
                [(6.8688456197, -52.0857892042), (6.0118230737, -52.1802340142), (5.1467506657, -52.2546440462), (4.274391, -52.3084107676)],
                knots=[0.9152088086, 0.9152088086, 0.9152088086, 0.9152088086, 0.9524273319, 0.9524273319, 0.9524273319, 0.9524273319], degree=3))
            add(Edge.make_bspline(
                [(17.6440274514, -49.7290193437), (14.2512357594, -50.8675933181), (10.6378865758, -51.670436821), (6.8688456197, -52.0857892042)],
                knots=[0.7515280054, 0.7515280054, 0.7515280054, 0.7515280054, 0.9152088086, 0.9152088086, 0.9152088086, 0.9152088086], degree=3))
            add(Edge.make_bspline(
                [(17.6440274537, -49.729019344), (17.0311754569, -40.7368621909), (19.3145165012, -31.800141131), (24.801034, -24.322837)],
                knots=[0.593126466, 0.593126466, 0.593126466, 0.593126466, 1, 1, 1, 1], degree=3))
            add(Edge.make_bspline(
                [(24.801034, -24.322837), (26.8241254465, -21.5600342644), (29.1667116086, -19.1520336904), (31.7572682547, -17.1057755436)],
                knots=[0, 0, 0, 0, 0.1500300155, 0.1500300155, 0.1500300155, 0.1500300155], degree=3))
            add(Edge.make_bspline(
                [(31.7572682547, -17.1057755436), (30.7022451548, -17.30717244), (29.6130427928, -17.4126260015), (28.4989919964, -17.4126260015)],
                knots=[0.8834983945, 0.8834983945, 0.8834983945, 0.8834983945, 1, 1, 1, 1], degree=3))
            add(Edge.make_bspline(
                [(28.498992, -17.412626), (18.936739, -17.412626), (11.167443, -9.643331), (11.167443, -0.118331)],
                knots=[0, 0, 0, 0, 1, 1, 1, 1], degree=3))
            add(Edge.make_bspline(
                [(11.1674430006, -0.1183309997), (11.1674430006, 5.627639161), (13.9726326914, 10.7126893493), (18.2864119041, 13.856445722)],
                knots=[0, 0, 0, 0, 0.6008835063, 0.6008835063, 0.6008835063, 0.6008835063], degree=3))
            add(Edge.make_bspline(
                [(7.5071641473, 16.3641522212), (11.2838455632, 15.9010039293), (14.8989934452, 15.0473276915), (18.2864119041, 13.8564457219)],
                knots=[0.0940532477, 0.0940532477, 0.0940532477, 0.0940532477, 0.25884533, 0.25884533, 0.25884533, 0.25884533], degree=3))
            add(Edge.make_bspline(
                [(4.5089480455, 16.6466515848), (5.5186328345, 16.5798891894), (6.5184341258, 16.4854038096), (7.5071641473, 16.3641522212)],
                knots=[0.0509109063, 0.0509109063, 0.0509109063, 0.0509109063, 0.0940532477, 0.0940532477, 0.0940532477, 0.0940532477], degree=3))
            add(Edge.make_bspline(
                [(0.895119, 16.765614), (2.112190798, 16.765614), (3.3174511085, 16.7254357662), (4.5089480455, 16.6466515848)],
                knots=[0, 0, 0, 0, 0.0509109063, 0.0509109063, 0.0509109063, 0.0509109063], degree=3))
            add(Edge.make_bspline(
                [(-2.9411196849, 16.6314859824), (-1.6772622212, 16.7202764427), (-0.3977361304, 16.7656140019), (0.8951190028, 16.7656140019)],
                knots=[0.9459190297, 0.9459190297, 0.9459190297, 0.9459190297, 1, 1, 1, 1], degree=3))
        make_face()
        with BuildLine():
            Line((16.61114, -28.020637), (16.61114, -28.898724))
            add(Edge.make_bspline(
                [(12.734443, -39.781365), (15.920232, -37.835476), (17.632841, -33.879291), (16.61114, -28.898724)],
                knots=[0, 0, 0, 0, 1, 1, 1, 1], degree=3))
            add(Edge.make_bspline(
                [(1.00017, -41.25807), (5.226522, -41.967898), (9.484578, -41.766392), (12.734443, -39.781365)],
                knots=[0, 0, 0, 0, 1, 1, 1, 1], degree=3))
            add(Edge.make_bspline(
                [(-10.698271, -36.455334), (-7.464044, -38.870817), (-3.226178, -40.548244), (1.00017, -41.25807)],
                knots=[0, 0, 0, 0, 1, 1, 1, 1], degree=3))
            add(Edge.make_bspline(
                [(-15.771656, -26.734652), (-16.337542, -30.634506), (-13.932498, -34.039847), (-10.698271, -36.455334)],
                knots=[0, 0, 0, 0, 1, 1, 1, 1], degree=3))
            Line((-15.771656, -26.734652), (-11.946774, -27.289724))
            add(Edge.make_bspline(
                [(-8.385923, -33.358605), (-10.989276, -31.414286), (-12.239972, -29.310328), (-11.946774, -27.289724)],
                knots=[0, 0, 0, 0, 1, 1, 1, 1], degree=3))
            add(Edge.make_bspline(
                [(1.640132, -37.446969), (-2.000989, -36.835433), (-5.782567, -35.302924), (-8.385923, -33.358605)],
                knots=[0, 0, 0, 0, 1, 1, 1, 1], degree=3))
            add(Edge.make_bspline(
                [(10.719751, -36.483446), (8.739023, -37.693279), (5.281256, -38.058505), (1.640132, -37.446969)],
                knots=[0, 0, 0, 0, 1, 1, 1, 1], degree=3))
            add(Edge.make_bspline(
                [(12.793421, -29.454349), (13.710785, -33.520561), (12.70048, -35.27361), (10.719751, -36.483446)],
                knots=[0, 0, 0, 0, 1, 1, 1, 1], degree=3))
            add(Edge.make_bspline(
                [(12.746019, -29.029361), (12.74605, -29.172341), (12.761948, -29.314876), (12.793421, -29.454349)],
                knots=[0, 0, 0, 0, 1, 1, 1, 1], degree=3))
            add(Edge.make_bspline(
                [(12.746019, -28.020637), (12.746019, -28.0208513466), (12.746019, -28.0210702537), (12.746019, -28.0378303299), (12.746019, -28.3570972405), (12.746019, -28.6929007595), (12.746019, -29.0121676701), (12.746019, -29.0289277463), (12.746019, -29.0291466534), (12.746019, -29.029361)],
                knots=[0, 0, 0, 0, 0.0006430397, 0.0006567214, 0.0502802287, 0.9584437713, 1.0080672786, 1.0080809603, 1.008724, 1.008724, 1.008724, 1.008724], degree=3))
            Line((12.746019, -28.020637), (16.61114, -28.020637))
        make_face(mode=Mode.SUBTRACT)
    extrude(amount=F2_DEPTH)


solid = Compound([f1.part, f1b_1.part])
